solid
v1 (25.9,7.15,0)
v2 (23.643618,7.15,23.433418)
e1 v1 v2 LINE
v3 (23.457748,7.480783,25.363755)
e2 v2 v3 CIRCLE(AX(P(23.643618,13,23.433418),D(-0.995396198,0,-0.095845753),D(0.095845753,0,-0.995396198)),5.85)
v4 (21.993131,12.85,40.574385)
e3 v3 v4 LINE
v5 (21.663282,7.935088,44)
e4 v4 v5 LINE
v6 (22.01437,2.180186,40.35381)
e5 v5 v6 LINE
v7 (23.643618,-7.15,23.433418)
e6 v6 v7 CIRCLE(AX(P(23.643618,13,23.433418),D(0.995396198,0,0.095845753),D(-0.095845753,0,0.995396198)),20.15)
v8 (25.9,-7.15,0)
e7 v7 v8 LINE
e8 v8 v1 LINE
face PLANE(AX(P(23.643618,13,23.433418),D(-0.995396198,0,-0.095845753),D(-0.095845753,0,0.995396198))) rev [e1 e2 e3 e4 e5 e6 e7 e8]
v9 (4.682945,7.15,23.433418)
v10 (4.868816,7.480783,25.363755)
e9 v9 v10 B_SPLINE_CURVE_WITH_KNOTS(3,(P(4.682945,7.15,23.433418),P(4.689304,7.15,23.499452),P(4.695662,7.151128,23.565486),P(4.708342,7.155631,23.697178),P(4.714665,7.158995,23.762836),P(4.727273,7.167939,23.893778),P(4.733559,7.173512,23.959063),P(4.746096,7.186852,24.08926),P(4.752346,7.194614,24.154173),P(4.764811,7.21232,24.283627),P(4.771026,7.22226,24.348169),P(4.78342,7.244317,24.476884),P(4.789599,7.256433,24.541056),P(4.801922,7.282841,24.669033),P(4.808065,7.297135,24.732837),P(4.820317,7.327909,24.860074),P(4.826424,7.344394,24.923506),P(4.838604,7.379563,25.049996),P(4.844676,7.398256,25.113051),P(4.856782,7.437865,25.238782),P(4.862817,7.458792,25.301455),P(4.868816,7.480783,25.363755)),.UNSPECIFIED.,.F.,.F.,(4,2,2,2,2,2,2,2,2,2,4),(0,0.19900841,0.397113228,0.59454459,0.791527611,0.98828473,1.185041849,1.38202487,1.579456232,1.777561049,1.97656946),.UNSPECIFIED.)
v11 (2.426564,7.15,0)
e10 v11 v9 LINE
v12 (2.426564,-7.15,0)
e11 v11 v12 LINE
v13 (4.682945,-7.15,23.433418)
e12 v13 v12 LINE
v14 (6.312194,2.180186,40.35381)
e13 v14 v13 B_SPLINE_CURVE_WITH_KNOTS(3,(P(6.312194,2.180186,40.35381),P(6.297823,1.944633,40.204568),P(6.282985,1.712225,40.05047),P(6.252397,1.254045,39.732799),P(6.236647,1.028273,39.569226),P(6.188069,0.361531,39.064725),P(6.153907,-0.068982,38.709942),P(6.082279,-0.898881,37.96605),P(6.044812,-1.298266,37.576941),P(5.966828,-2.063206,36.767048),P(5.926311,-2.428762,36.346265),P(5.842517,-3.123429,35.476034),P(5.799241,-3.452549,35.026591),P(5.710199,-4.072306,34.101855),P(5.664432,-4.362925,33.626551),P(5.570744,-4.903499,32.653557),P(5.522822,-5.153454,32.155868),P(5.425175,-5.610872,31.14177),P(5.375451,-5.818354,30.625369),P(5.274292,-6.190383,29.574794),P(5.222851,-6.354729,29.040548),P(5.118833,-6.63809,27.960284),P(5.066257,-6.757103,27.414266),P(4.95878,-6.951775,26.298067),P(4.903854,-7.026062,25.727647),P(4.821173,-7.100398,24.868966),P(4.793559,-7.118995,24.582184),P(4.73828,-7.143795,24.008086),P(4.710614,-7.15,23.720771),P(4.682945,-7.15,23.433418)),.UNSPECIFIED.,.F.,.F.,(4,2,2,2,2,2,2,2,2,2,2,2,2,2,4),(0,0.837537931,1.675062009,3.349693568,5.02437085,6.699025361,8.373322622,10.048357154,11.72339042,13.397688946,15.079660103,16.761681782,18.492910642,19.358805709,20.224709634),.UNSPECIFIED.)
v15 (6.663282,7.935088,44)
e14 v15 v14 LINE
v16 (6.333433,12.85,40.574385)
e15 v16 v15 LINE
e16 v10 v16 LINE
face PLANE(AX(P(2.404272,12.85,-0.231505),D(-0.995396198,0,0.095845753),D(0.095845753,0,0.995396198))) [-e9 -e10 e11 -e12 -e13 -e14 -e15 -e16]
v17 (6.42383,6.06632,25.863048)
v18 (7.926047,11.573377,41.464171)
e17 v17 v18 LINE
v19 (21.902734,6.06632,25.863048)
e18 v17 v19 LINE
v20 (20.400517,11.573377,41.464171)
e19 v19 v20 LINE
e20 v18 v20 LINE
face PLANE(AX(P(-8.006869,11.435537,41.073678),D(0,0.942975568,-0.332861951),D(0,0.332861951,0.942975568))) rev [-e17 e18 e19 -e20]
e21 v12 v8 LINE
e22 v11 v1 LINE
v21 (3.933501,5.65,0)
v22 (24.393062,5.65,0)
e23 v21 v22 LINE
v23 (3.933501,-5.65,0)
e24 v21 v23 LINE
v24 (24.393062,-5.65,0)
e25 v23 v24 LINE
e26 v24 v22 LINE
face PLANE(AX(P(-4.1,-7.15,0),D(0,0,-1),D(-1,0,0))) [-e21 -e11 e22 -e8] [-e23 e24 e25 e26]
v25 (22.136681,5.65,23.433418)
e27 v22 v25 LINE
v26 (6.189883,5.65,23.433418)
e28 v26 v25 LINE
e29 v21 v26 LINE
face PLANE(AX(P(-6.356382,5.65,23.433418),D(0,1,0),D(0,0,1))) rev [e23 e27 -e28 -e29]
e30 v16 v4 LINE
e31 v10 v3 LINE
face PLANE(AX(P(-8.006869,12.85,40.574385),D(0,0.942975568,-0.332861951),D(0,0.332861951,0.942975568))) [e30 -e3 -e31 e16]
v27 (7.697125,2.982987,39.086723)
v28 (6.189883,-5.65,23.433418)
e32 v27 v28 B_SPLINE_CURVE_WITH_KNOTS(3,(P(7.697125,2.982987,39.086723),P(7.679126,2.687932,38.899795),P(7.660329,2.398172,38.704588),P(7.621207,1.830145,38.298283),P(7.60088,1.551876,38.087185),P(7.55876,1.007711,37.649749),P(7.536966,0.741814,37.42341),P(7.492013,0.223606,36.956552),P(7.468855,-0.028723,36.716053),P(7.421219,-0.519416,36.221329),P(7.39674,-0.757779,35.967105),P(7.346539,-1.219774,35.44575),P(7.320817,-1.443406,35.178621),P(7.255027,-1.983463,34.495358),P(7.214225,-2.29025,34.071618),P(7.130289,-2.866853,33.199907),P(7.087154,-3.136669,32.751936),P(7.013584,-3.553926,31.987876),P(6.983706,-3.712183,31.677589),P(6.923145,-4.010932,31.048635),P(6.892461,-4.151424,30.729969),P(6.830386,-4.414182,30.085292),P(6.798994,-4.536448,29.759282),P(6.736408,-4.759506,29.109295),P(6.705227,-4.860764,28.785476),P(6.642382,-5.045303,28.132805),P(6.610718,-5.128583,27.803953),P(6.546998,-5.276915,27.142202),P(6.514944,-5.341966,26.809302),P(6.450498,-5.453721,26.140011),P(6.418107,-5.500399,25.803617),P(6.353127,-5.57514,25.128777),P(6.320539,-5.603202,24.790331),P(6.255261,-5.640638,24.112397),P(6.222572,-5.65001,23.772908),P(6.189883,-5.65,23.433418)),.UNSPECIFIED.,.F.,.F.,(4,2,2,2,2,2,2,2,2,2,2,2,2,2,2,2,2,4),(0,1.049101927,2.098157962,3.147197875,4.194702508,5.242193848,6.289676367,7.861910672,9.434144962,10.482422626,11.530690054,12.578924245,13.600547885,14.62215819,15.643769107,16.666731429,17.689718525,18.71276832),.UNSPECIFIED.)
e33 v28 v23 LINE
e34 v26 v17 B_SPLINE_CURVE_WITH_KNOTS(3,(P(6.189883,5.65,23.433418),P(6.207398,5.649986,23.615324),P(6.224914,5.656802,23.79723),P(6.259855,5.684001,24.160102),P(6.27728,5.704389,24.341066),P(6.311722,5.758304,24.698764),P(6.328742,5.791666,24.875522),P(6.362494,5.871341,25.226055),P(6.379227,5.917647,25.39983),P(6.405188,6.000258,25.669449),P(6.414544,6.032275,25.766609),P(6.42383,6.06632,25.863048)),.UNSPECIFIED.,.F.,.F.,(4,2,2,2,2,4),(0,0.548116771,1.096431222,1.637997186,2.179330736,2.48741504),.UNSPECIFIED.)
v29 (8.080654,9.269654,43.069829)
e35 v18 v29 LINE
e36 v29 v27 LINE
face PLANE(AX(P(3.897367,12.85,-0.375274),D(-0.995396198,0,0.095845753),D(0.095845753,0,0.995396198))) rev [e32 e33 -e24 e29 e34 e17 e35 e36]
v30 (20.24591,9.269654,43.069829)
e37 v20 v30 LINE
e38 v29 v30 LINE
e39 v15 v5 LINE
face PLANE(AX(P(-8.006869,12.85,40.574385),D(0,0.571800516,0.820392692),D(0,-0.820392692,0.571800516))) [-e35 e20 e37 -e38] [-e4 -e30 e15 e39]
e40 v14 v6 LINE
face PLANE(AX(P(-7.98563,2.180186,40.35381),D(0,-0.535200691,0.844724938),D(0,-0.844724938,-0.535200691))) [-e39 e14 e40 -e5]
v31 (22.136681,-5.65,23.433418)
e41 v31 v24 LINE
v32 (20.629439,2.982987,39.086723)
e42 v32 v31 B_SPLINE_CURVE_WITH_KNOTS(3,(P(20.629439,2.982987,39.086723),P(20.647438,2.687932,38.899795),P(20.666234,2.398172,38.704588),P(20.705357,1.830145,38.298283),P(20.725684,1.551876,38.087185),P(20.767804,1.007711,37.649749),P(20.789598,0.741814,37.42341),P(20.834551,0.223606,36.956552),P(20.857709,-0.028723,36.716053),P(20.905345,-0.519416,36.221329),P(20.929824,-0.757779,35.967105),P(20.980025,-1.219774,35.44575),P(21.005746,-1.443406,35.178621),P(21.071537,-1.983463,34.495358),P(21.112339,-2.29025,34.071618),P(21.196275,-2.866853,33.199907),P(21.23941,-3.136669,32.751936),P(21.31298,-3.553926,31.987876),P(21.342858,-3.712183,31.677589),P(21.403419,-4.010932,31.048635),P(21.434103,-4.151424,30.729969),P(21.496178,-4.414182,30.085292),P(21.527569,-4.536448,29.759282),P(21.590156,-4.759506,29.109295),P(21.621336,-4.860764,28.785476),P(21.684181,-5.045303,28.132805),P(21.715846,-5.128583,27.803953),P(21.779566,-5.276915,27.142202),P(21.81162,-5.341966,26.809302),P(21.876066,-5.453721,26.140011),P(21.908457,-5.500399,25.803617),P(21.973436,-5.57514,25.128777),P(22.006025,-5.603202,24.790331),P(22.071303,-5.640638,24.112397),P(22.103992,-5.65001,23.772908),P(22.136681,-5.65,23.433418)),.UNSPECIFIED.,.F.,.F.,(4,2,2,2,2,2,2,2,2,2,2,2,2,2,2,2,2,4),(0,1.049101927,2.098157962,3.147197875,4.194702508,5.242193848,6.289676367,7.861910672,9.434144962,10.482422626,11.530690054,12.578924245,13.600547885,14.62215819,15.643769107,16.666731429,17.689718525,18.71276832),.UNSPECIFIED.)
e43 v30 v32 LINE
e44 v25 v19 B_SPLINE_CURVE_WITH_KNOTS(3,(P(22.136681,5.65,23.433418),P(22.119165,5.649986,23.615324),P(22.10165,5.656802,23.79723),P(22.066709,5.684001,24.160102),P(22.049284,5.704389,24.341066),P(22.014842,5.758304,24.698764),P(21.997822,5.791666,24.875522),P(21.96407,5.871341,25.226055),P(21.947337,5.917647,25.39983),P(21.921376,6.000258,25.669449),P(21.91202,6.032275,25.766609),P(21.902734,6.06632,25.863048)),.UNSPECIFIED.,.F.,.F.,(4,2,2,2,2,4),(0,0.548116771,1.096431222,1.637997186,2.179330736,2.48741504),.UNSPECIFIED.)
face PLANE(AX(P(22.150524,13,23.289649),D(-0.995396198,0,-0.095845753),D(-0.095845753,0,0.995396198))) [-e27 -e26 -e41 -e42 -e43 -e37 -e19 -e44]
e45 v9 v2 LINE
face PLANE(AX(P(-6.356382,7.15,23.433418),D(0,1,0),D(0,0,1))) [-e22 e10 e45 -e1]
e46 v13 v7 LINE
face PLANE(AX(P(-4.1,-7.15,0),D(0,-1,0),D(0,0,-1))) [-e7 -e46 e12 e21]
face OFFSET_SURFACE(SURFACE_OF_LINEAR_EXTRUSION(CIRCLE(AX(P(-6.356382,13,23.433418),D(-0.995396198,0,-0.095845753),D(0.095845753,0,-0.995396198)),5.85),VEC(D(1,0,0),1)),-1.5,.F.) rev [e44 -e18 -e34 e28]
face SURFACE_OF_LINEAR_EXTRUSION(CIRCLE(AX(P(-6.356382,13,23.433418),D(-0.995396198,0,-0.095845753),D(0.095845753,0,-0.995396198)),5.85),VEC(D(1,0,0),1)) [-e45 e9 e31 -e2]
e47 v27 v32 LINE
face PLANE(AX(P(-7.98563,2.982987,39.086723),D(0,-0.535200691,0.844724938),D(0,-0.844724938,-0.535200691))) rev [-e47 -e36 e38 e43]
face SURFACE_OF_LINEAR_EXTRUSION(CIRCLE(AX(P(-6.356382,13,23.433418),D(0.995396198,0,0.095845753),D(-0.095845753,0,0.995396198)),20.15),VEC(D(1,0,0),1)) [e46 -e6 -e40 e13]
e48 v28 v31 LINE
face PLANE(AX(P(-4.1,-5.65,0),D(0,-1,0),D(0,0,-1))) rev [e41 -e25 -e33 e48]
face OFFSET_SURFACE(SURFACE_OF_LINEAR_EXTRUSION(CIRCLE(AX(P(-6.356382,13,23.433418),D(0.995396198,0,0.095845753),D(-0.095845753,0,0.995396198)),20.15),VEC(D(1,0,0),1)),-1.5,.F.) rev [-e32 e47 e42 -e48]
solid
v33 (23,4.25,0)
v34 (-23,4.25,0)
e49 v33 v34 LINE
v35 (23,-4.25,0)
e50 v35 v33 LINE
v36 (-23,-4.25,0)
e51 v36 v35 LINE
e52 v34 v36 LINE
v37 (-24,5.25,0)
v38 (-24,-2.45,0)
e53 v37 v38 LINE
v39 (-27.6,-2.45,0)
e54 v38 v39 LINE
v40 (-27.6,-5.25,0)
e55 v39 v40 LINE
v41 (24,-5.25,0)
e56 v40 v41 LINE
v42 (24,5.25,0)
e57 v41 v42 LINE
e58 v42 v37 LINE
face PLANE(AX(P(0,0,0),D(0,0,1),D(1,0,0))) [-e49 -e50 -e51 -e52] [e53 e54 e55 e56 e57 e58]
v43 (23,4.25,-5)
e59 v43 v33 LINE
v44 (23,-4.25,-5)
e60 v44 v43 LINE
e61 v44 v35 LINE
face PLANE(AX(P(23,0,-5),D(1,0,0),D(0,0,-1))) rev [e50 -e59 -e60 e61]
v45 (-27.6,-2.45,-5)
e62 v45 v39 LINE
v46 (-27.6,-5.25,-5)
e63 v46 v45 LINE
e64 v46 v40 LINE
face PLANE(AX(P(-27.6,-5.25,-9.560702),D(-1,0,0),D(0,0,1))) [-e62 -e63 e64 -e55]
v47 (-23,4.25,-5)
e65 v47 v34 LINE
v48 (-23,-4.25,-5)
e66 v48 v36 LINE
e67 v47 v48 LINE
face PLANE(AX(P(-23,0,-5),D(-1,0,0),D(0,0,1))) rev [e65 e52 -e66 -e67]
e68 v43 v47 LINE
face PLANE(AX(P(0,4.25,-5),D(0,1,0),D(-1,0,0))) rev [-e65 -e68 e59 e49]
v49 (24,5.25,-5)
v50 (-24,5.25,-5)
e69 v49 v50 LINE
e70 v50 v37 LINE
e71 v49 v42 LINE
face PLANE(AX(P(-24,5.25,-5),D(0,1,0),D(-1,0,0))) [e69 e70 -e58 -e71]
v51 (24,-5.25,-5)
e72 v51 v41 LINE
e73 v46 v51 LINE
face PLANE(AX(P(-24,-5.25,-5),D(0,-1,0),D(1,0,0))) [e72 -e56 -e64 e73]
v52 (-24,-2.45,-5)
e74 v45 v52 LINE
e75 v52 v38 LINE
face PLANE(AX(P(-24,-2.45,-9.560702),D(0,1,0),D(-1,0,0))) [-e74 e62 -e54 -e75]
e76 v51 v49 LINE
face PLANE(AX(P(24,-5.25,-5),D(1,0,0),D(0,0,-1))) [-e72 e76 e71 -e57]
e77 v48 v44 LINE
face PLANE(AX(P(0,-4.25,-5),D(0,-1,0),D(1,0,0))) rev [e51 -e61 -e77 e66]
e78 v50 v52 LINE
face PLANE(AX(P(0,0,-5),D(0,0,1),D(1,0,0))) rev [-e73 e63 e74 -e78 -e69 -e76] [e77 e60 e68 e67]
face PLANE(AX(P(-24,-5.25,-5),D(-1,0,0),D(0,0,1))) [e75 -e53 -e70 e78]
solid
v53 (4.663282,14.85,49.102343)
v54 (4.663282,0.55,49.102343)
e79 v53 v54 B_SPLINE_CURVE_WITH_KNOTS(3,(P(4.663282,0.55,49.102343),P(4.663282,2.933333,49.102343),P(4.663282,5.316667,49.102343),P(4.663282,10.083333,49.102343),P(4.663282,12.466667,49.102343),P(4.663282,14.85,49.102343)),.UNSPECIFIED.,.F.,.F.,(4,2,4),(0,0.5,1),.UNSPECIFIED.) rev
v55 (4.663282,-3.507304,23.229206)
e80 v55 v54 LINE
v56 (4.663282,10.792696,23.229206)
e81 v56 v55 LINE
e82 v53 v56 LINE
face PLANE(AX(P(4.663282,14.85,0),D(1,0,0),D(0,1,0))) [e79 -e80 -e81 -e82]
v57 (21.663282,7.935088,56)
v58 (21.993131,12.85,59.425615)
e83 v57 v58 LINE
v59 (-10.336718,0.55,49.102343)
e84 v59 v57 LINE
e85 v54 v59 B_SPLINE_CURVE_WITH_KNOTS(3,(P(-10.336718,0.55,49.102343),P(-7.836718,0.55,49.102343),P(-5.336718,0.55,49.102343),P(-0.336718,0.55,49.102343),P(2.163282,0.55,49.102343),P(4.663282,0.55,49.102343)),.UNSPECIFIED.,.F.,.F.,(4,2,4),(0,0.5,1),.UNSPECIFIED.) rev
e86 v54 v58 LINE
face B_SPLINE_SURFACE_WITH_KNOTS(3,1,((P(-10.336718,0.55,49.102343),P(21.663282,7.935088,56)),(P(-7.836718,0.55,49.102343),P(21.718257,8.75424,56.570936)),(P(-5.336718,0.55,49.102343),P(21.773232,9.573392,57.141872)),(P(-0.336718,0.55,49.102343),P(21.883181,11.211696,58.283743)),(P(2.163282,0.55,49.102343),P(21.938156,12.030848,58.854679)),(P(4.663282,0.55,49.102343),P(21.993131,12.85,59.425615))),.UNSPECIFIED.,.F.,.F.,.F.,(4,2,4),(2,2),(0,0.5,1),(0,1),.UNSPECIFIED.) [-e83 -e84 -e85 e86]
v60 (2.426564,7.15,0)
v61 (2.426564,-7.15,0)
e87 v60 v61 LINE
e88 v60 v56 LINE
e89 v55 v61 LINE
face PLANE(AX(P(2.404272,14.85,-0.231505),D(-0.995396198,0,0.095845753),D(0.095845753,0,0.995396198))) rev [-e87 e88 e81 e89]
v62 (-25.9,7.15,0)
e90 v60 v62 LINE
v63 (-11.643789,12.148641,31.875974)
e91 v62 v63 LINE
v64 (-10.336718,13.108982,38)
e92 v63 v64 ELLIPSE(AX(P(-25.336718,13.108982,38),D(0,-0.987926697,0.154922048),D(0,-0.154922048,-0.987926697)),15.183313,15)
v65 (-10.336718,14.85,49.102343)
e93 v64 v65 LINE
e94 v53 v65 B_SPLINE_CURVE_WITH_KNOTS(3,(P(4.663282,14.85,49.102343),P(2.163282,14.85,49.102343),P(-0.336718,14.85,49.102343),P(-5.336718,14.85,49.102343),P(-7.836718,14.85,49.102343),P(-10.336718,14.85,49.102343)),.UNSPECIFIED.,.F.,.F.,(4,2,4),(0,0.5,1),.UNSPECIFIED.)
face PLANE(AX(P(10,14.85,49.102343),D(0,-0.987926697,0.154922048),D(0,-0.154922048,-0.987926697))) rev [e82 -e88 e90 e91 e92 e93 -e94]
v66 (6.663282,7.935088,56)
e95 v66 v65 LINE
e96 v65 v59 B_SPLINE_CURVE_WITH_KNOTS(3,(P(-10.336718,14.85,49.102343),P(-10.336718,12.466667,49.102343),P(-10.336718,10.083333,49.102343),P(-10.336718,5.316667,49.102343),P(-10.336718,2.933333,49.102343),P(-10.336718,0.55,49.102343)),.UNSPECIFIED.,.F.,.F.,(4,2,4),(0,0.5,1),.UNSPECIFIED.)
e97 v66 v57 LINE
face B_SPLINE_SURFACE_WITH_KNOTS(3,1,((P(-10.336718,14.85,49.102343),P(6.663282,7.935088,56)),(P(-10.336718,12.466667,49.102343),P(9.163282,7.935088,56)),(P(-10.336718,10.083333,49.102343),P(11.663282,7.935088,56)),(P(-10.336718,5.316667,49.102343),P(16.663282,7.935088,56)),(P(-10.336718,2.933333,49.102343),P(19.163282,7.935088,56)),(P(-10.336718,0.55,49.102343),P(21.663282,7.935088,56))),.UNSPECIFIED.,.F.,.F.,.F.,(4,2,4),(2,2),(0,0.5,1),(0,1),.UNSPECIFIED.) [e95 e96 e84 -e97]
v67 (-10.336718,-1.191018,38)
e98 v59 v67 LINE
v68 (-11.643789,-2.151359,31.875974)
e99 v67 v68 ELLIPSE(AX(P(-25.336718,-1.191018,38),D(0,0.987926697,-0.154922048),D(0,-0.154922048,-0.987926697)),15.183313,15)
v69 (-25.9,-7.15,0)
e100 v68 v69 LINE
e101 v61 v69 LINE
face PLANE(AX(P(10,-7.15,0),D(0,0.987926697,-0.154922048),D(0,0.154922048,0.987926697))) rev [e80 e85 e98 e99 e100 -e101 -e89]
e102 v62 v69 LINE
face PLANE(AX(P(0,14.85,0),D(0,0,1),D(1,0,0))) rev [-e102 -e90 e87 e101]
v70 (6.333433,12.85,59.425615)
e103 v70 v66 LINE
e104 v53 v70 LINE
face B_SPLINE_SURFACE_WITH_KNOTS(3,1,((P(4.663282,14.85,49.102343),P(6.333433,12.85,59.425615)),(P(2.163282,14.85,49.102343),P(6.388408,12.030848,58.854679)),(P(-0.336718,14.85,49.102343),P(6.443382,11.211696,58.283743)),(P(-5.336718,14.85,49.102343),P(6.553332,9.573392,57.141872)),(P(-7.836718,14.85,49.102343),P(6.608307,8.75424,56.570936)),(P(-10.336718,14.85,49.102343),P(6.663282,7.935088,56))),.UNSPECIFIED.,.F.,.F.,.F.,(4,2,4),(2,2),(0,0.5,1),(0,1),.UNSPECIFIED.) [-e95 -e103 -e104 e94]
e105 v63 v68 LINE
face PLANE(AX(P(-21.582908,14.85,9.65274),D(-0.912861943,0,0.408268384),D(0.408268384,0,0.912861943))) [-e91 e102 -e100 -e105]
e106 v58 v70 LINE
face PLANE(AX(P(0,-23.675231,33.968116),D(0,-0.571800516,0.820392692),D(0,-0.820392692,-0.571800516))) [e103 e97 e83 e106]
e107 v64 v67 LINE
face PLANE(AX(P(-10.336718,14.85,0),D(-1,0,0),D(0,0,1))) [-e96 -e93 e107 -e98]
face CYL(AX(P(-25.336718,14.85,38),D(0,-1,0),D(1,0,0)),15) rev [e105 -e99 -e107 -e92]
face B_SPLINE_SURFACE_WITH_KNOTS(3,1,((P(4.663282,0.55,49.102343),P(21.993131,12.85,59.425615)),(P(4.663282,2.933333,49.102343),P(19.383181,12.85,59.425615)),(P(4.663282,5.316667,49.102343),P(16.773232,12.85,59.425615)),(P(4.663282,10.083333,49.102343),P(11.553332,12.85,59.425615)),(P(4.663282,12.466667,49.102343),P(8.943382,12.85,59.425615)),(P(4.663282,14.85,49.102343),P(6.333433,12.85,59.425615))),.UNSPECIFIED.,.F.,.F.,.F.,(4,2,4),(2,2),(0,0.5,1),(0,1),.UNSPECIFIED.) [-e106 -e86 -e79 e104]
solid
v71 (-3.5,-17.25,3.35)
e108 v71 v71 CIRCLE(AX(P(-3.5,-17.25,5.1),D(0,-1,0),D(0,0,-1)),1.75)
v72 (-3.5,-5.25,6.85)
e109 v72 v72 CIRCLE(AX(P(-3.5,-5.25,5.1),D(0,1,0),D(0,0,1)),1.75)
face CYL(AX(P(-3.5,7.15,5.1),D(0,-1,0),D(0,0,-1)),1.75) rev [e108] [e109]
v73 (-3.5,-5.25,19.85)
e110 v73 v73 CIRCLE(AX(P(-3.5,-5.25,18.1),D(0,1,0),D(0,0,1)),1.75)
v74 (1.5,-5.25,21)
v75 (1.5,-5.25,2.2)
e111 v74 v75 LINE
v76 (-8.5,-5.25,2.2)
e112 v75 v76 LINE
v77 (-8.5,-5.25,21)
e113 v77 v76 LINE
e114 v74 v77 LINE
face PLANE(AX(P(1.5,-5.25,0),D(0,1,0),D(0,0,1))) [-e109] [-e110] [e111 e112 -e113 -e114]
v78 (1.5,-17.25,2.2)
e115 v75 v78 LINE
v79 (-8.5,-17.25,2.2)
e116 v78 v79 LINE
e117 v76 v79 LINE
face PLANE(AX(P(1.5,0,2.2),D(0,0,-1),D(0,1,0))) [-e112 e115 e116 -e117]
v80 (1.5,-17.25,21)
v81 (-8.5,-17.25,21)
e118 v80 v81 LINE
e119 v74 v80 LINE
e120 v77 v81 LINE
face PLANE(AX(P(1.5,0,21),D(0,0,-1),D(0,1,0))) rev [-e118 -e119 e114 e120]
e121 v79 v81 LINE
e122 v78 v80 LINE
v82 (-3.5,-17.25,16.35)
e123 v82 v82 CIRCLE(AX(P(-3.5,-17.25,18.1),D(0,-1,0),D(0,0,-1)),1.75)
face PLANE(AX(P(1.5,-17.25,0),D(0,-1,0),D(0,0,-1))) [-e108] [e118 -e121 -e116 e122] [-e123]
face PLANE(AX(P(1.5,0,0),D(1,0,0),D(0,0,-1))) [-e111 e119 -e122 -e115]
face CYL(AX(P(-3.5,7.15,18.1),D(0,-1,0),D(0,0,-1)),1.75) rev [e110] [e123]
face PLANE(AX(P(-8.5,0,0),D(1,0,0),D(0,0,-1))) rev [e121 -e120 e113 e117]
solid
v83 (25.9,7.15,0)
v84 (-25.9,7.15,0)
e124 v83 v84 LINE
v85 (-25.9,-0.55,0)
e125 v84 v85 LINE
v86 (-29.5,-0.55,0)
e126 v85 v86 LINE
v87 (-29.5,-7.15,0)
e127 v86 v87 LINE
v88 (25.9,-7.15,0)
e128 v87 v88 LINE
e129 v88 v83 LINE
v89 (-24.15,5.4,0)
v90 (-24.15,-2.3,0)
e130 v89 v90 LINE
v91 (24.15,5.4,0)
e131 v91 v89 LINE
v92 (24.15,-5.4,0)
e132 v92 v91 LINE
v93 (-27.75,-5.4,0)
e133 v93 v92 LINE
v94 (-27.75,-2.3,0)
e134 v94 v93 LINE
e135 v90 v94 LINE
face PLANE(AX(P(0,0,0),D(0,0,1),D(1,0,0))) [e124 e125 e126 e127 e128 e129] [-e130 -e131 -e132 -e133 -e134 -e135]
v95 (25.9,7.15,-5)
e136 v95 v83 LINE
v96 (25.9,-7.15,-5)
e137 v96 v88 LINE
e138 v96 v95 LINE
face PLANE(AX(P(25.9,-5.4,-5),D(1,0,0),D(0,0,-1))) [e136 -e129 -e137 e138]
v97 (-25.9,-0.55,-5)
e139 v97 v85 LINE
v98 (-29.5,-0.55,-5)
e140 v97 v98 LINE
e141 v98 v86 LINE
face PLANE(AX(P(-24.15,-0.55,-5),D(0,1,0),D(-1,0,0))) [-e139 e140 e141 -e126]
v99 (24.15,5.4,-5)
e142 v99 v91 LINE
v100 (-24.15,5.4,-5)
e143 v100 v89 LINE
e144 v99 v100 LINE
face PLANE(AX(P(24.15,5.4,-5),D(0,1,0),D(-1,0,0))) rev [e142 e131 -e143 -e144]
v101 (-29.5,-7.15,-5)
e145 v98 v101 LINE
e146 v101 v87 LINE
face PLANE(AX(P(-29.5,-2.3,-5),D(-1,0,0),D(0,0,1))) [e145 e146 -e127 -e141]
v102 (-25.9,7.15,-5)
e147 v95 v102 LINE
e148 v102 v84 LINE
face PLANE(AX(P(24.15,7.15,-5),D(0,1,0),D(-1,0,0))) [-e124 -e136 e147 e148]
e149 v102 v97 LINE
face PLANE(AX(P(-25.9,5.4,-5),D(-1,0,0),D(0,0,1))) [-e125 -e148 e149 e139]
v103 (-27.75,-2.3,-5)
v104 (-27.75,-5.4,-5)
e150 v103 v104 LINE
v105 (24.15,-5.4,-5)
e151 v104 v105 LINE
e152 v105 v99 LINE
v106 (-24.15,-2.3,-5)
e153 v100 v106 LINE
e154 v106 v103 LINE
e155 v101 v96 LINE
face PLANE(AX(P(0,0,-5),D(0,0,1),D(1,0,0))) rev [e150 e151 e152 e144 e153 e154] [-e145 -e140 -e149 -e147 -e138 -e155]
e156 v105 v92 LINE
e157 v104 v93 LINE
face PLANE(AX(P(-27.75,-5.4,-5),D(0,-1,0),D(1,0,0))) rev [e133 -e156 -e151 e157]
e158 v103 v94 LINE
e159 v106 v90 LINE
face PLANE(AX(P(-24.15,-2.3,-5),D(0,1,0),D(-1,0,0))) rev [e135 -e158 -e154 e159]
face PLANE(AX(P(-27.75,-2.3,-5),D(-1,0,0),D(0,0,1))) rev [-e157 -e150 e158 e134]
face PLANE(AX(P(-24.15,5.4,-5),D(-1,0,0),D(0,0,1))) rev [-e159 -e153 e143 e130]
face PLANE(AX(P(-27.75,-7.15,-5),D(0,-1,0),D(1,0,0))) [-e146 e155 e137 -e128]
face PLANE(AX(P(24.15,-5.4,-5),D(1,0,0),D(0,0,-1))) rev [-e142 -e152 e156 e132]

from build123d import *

# Parameters (mm, degrees)
SKETCH1_W                 = 48
SKETCH1_H                 = 10.5
SKETCH1_W_2               = 46
SKETCH1_H_2               = 8.5
EXTRUDE_THIN1_DEPTH       = 5
SKETCH5_W                 = 3.6
SKETCH5_H                 = 2.8
BOSS_EXTRUDE2_DEPTH       = 5
EXTRUDE_THIN2_DEPTH       = 5
BOSS_EXTRUDE12_START      = -3.5
SKETCH12_W                = 18.8
SKETCH12_H                = 12
BOSS_EXTRUDE12_DEPTH      = 5
CUT_EXTRUDE1_DEPTH        = 44.664745505
CUT_EXTRUDE1_DEPTH_BACK   = 44.664745505
SKETCH14_R                = 1.75
BOSS_EXTRUDE13_DEPTH      = 20
BOSS_EXTRUDE14_DEPTH      = 30
SHELL1_T                  = -1.5
BOSS_EXTRUDE15_DEPTH      = 22
BOSS_EXTRUDE16_DEPTH      = 10
BOSS_EXTRUDE16_DEPTH_BACK = 30


with BuildPart() as part:
    # Sketch1 → Extrude-Thin1 (new body)
    with BuildSketch(Plane.XY):
        Rectangle(SKETCH1_W, SKETCH1_H)
        Rectangle(SKETCH1_W_2, SKETCH1_H_2, mode=Mode.SUBTRACT)
    extrude(amount=-EXTRUDE_THIN1_DEPTH)

    # Sketch5 → Boss-Extrude2 (add)
    with BuildSketch(Plane.XY):
        with Locations((-25.8, -3.85)):
            Rectangle(SKETCH5_W, SKETCH5_H)
    extrude(amount=-BOSS_EXTRUDE2_DEPTH)


with BuildPart() as body_2:
    # Sketch6 → Extrude-Thin2 (new body)
    with BuildSketch(Plane.XY):
        Polygon((-25.9, 7.15), (-25.9, -0.55), (-29.5, -0.55), (-29.5, -7.15), (25.9, -7.15), (25.9, 7.15), align=None)
        Polygon((-24.15, 5.4), (-24.15, -2.3), (-27.75, -2.3), (-27.75, -5.4), (24.15, -5.4), (24.15, 5.4), align=None, mode=Mode.SUBTRACT)
    extrude(amount=-EXTRUDE_THIN2_DEPTH)


with BuildPart() as body_3:
    # Sketch12 → Boss-Extrude12 (new, symmetric)
    with BuildSketch(Plane(origin=(0, 0, 0), x_dir=(0, 0, -1), z_dir=(1, 0, 0)).offset(BOSS_EXTRUDE12_START)):
        with Locations((-11.6, -11.25)):
            Rectangle(SKETCH12_W, SKETCH12_H)
    extrude(amount=BOSS_EXTRUDE12_DEPTH, both=True)

    # Sketch14 → Cut-Extrude1 (cut, two sides: drawn at the far end of the back side and taken through both)
    with BuildSketch(Plane.XZ.offset(17.25).offset(-CUT_EXTRUDE1_DEPTH_BACK)):
        with Locations(Location((-3.5, 18.1, 0), (0, 0, 270))):
            Circle(SKETCH14_R)
        with Locations(Location((-3.5, 5.1, 0), (0, 0, 270))):
            Circle(SKETCH14_R)
    extrude(amount=CUT_EXTRUDE1_DEPTH + CUT_EXTRUDE1_DEPTH_BACK, mode=Mode.SUBTRACT)


with BuildPart() as body_4:
    # Sketch17 → Boss-Extrude13 (new body)
    with BuildSketch(Plane.XZ.offset(7.15)):
        Polygon((2.426563759, 0), (14.163281879, 0), (14.163281879, 44), (6.663281879, 44), (4.663281879, 23.22920584), align=None)
        Polygon((14.163281879, 0), (25.9, 0), (21.663281879, 44), (14.163281879, 44), align=None)
    extrude(amount=-BOSS_EXTRUDE13_DEPTH)


with BuildPart() as body_5:
    # Sketch18 → Boss-Extrude14 (new, along a direction that is not the sketch's normal)
    with BuildSketch(Plane(origin=(25.662072026, 0, 2.47097649), x_dir=(0.0958457525202189, 0, -0.9953961983671794), z_dir=(0.9953961983671794, 0, 0.0958457525202189))):
        with BuildLine():
            Line((2.48240499, -7.15), (2.48240499, 7.15))
            Line((2.48240499, 7.15), (-21.059394801, 7.15))
            ThreePointArc((-21.059394801, 7.15), (-22.043031658, 7.233288759), (-22.998659663, 7.480783408))
            Line((-22.998659663, 7.480783408), (-38.279640556, 12.85))
            Line((-38.279640556, 12.85), (-41.721099174, 7.935087734))
            Line((-41.721099174, 7.935087734), (-38.058045186, 2.180185533))
            ThreePointArc((-38.058045186, 2.180185533), (-30.754838022, -4.664112793), (-21.059394801, -7.15))
            Line((-21.059394801, -7.15), (2.48240499, -7.15))
        make_face()
    extrude(amount=-BOSS_EXTRUDE14_DEPTH, dir=(1, 0, 0))

    # Combine1: intersect body 4
    add(body_4.part, mode=Mode.INTERSECT)

    # Shell1
    shell1_openings = [body_5.faces().sort_by_distance(p)[0] for p in [
        (14.163281879, 10.410169392, 42.27490788),
        (14.163281879, 0, 0),
    ]]
    offset(amount=SHELL1_T, openings=shell1_openings, kind=Kind.INTERSECTION)


with BuildPart() as body_5_2:
    # Sketch17<3> → Boss-Extrude15 (new body)
    with BuildSketch(Plane.XZ.offset(7.15)):
        with BuildLine():
            Line((-25.9, 0), (2.426563759, 0))
            Line((2.426563759, 0), (4.663281879, 23.22920584))
            Line((4.663281879, 23.22920584), (4.663281879, 49.102343279))
            Line((4.663281879, 49.102343279), (-10.336718121, 49.102343279))
            Line((-10.336718121, 49.102343279), (-10.336718121, 38))
            ThreePointArc((-10.336718121, 38), (-10.667124787, 34.869020691), (-11.643788978, 31.875974241))
            Line((-11.643788978, 31.875974241), (-25.9, 0))
        make_face()
    extrude(amount=-BOSS_EXTRUDE15_DEPTH)


with BuildPart() as body_6:
    # Sketch19 → Boss-Extrude16 (new, two sides: drawn at the far end of the back side and taken through both)
    with BuildSketch(Plane(origin=(0, 0, 0), x_dir=(0, 0, -1), z_dir=(1, 0, 0)).offset(-BOSS_EXTRUDE16_DEPTH_BACK)):
        Polygon((0, -7.15), (-49.102343279, 0.55), (-49.102343279, 14.85), (0, 7.15), align=None)
    extrude(amount=BOSS_EXTRUDE16_DEPTH + BOSS_EXTRUDE16_DEPTH_BACK)


with BuildPart() as body_5_2_1:
    add(body_5_2.part)

    # Combine2: intersect body 6
    add(body_6.part, mode=Mode.INTERSECT)

    # Loft4: read off the stored shape, not the designer's step
    # Loft4: loft between two sections, ruled curve by curve
    loft4_from = [
        Edge.make_bspline([(-10.336718121, 14.85, 49.102343279), (-10.336718121, 12.466666667, 49.102343279), (-10.336718121, 10.083333333, 49.102343279), (-10.336718121, 5.316666667, 49.102343279), (-10.336718121, 2.933333333, 49.102343279), (-10.336718121, 0.55, 49.102343279)], [0, 0, 0, 0, 0.5, 0.5, 1, 1, 1, 1], 3),
        Edge.make_bspline([(-10.336718121, 0.55, 49.102343279), (-7.836718121, 0.55, 49.102343279), (-5.336718121, 0.55, 49.102343279), (-0.336718121, 0.55, 49.102343279), (2.163281879, 0.55, 49.102343279), (4.663281879, 0.55, 49.102343279)], [0, 0, 0, 0, 0.5, 0.5, 1, 1, 1, 1], 3),
        Edge.make_bspline([(4.663281879, 14.85, 49.102343279), (2.163281879, 14.85, 49.102343279), (-0.336718121, 14.85, 49.102343279), (-5.336718121, 14.85, 49.102343279), (-7.836718121, 14.85, 49.102343279), (-10.336718121, 14.85, 49.102343279)], [0, 0, 0, 0, 0.5, 0.5, 1, 1, 1, 1], 3),
        Edge.make_bspline([(4.663281879, 0.55, 49.102343279), (4.663281879, 2.933333333, 49.102343279), (4.663281879, 5.316666667, 49.102343279), (4.663281879, 10.083333333, 49.102343279), (4.663281879, 12.466666667, 49.102343279), (4.663281879, 14.85, 49.102343279)], [0, 0, 0, 0, 0.5, 0.5, 1, 1, 1, 1], 3),
    ]
    loft4_to = [
        Edge.make_bspline([(6.663281879, 7.935087734, 56), (9.163281879, 7.935087734, 56), (11.663281879, 7.935087734, 56), (16.663281879, 7.935087734, 56), (19.163281879, 7.935087734, 56), (21.663281879, 7.935087734, 56)], [0, 0, 0, 0, 0.5, 0.5, 1, 1, 1, 1], 3),
        Edge.make_bspline([(21.663281879, 7.935087734, 56), (21.718256744, 8.754239779, 56.570935804), (21.77323161, 9.573391823, 57.141871608), (21.88318134, 11.211695911, 58.283743217), (21.938156205, 12.030847956, 58.854679021), (21.99313107, 12.85, 59.425614825)], [0, 0, 0, 0, 0.5, 0.5, 1, 1, 1, 1], 3),
        Edge.make_bspline([(6.333432688, 12.85, 59.425614825), (6.388407553, 12.030847956, 58.854679021), (6.443382419, 11.211695911, 58.283743217), (6.553332149, 9.573391823, 57.141871608), (6.608307014, 8.754239779, 56.570935804), (6.663281879, 7.935087734, 56)], [0, 0, 0, 0, 0.5, 0.5, 1, 1, 1, 1], 3),
        Edge.make_bspline([(21.99313107, 12.85, 59.425614825), (19.38318134, 12.85, 59.425614825), (16.77323161, 12.85, 59.425614825), (11.553332149, 12.85, 59.425614825), (8.943382419, 12.85, 59.425614825), (6.333432688, 12.85, 59.425614825)], [0, 0, 0, 0, 0.5, 0.5, 1, 1, 1, 1], 3),
    ]
    loft4 = Solid(Shell([*[Face.make_surface_from_curves(loft4_from[k], loft4_to[k]) for k in range(4)], Face(Wire(loft4_from)), Face(Wire(loft4_to))]))
    add(loft4)


solid = Compound([part.part, body_2.part, body_3.part, body_5.part, body_5_2_1.part])
